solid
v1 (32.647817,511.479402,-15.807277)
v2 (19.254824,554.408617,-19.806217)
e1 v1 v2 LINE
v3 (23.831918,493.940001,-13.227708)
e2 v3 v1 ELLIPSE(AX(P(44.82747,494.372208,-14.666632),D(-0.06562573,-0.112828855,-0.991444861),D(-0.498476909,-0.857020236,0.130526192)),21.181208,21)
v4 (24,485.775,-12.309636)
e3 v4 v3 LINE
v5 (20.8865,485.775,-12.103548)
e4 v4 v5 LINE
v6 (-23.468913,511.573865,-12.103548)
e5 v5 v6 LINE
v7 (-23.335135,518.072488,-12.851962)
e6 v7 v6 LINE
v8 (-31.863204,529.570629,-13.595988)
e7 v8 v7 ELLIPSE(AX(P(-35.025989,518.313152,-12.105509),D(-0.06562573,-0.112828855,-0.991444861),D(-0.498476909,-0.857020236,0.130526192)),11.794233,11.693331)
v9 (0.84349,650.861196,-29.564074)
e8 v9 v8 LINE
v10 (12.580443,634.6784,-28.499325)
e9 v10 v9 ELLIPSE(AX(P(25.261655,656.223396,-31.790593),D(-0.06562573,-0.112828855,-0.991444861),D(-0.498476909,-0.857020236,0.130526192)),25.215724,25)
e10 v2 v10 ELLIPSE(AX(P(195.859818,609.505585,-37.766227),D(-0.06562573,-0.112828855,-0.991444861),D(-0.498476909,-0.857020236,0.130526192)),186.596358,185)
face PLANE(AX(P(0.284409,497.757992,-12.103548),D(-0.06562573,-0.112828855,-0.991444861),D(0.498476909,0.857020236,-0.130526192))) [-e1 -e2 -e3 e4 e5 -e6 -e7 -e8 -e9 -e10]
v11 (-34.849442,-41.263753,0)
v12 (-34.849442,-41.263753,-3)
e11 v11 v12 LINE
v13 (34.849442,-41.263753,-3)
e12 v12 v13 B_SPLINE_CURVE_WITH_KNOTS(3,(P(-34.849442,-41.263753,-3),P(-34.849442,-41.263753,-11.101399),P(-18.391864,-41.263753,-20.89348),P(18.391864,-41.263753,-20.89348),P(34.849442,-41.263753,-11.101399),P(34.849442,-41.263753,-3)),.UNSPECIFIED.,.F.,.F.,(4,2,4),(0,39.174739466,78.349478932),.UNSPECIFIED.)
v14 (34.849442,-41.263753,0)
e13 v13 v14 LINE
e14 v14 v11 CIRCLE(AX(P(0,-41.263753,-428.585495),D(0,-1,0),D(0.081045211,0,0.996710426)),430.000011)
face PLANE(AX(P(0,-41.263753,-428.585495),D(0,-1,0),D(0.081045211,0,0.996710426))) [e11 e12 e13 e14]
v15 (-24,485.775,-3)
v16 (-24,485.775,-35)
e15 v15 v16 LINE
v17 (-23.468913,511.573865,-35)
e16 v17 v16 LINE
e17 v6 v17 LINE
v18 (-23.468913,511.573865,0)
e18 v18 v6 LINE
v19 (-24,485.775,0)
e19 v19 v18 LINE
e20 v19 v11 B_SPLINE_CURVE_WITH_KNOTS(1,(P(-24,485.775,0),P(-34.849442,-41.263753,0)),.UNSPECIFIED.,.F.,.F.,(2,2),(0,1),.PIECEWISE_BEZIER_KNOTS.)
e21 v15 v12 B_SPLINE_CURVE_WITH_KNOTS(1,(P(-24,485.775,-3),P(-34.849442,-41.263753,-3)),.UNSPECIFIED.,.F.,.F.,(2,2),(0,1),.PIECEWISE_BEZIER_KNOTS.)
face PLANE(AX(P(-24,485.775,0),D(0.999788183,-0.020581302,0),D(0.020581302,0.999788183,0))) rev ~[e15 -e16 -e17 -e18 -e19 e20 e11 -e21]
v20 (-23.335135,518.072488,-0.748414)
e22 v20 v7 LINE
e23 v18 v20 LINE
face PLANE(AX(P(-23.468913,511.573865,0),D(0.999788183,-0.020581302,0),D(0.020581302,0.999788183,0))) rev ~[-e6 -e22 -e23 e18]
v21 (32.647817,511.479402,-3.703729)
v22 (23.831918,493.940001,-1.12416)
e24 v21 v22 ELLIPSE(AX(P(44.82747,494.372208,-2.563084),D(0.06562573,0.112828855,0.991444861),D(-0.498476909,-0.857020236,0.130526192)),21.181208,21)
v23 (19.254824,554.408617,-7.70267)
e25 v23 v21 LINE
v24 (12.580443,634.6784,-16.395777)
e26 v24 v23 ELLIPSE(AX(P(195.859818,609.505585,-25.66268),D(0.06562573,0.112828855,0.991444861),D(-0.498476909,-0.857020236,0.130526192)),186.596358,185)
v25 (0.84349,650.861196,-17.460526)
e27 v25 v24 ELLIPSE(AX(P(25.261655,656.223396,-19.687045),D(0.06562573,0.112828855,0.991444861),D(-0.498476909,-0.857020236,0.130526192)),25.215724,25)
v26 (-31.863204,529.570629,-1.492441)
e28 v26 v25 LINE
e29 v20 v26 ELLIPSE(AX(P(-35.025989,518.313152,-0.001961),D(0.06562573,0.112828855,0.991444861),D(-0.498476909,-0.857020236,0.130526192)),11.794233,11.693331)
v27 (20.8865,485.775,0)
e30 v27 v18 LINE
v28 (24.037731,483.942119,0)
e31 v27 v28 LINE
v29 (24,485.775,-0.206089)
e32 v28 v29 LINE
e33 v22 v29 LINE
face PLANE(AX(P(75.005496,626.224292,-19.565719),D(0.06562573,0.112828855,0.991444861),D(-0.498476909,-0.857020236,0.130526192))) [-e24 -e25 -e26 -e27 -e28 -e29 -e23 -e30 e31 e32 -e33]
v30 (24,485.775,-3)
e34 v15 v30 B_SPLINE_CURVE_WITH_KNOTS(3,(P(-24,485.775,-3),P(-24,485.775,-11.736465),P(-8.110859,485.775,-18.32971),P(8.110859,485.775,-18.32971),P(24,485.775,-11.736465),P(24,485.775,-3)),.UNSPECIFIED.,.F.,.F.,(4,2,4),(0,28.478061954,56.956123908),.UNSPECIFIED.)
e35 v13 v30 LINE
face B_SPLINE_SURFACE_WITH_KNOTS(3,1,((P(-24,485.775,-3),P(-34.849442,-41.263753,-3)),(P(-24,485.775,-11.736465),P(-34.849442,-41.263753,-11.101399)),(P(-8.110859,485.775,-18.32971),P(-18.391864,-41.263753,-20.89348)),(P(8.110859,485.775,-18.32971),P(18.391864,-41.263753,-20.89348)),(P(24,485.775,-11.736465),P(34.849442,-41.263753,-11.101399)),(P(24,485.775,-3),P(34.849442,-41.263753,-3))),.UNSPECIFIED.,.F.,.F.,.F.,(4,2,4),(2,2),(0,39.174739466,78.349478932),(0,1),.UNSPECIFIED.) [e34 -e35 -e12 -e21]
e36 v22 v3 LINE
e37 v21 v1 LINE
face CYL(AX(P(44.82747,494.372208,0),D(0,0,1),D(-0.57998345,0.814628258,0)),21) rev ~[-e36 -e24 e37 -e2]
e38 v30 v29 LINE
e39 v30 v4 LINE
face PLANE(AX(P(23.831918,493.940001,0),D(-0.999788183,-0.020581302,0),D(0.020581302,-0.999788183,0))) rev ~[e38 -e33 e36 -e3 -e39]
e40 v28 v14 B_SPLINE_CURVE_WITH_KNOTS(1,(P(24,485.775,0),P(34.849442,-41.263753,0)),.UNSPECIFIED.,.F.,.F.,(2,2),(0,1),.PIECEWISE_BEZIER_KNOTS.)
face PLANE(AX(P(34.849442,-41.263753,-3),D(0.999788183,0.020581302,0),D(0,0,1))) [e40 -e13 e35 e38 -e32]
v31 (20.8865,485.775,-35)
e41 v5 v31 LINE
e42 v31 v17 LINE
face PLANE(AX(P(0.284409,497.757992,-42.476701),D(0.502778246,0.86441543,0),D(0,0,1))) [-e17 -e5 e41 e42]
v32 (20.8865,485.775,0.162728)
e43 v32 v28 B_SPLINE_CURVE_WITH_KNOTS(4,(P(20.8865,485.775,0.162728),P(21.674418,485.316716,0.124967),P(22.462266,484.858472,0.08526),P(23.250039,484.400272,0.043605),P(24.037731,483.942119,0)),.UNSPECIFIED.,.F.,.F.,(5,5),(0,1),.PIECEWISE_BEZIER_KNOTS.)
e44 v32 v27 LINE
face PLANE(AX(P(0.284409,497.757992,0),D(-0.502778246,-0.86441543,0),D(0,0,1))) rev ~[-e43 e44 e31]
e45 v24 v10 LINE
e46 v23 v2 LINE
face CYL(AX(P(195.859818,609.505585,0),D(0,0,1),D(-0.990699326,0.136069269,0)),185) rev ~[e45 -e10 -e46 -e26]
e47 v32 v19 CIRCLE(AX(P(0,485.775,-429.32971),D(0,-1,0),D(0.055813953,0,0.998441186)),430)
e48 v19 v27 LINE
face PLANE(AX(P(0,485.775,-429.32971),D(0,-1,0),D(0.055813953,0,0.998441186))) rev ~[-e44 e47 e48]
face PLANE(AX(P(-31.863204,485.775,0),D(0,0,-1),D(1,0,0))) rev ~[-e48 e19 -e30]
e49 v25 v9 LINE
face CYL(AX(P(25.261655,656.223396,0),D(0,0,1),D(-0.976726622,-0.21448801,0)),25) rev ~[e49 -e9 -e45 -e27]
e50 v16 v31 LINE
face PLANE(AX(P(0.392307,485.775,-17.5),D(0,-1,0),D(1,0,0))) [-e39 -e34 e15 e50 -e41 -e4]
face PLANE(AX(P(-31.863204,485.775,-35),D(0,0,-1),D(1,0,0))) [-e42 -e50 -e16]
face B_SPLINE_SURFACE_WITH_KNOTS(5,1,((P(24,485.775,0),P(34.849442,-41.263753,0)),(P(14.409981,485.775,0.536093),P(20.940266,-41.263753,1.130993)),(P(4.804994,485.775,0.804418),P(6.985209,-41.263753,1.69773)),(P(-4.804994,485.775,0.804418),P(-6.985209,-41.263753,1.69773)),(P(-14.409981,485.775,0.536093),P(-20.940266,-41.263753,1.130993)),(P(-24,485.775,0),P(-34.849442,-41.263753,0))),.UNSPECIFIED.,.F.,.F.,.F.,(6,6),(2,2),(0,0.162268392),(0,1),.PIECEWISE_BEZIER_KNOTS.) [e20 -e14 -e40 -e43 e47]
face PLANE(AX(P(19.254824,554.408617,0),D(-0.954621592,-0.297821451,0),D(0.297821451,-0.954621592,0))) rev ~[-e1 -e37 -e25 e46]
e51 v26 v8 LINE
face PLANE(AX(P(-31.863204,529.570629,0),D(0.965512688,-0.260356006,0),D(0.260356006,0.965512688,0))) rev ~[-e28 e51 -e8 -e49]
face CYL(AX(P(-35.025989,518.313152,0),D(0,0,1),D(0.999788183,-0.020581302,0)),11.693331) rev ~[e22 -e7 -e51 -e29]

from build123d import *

# Parameters (mm, degrees)
F17_W          = 64.5110210379
F17_H          = 35
F18_DEPTH      = 165.0861956251
F21_DEPTH      = 300.8879553896
F21_DEPTH_BACK = 107.3482027968
F23_DEPTH      = 35.0010001


# Not quite as in the source:
# - ends of sketch curves that miss each other by under 0.0002 mm in the source are joined


with BuildPart() as f16:
    # F12 (on plane+point) → F16 section 0
    with BuildSketch(Plane.XZ.offset(-485.775)):
        with BuildLine():
            Line((24, -3), (24, 0))
            ThreePointArc((24, 0), (0, 0.6702898704), (-24, 0))
            Line((-24, 0), (-24, -3))
            add(Edge.make_bspline(
                [(0, -18.3297101296), (-8.1108585, -18.3297101296), (-24, -11.7364646867), (-24, -3)],
                knots=[0, 0, 0, 0, 28.4780619541, 28.4780619541, 28.4780619541, 28.4780619541], degree=3))
            add(Edge.make_bspline(
                [(0, -18.3297101296), (8.1108585, -18.3297101296), (24, -11.7364646867), (24, -3)],
                knots=[0, 0, 0, 0, 28.4780619541, 28.4780619541, 28.4780619541, 28.4780619541], degree=3))
        make_face()
    # F15 (on plane+point) → F16 section 1
    with BuildSketch(Plane.XZ.offset(41.2637528239)):
        with BuildLine():
            Line((34.849441672, -3), (34.849441672, 0))
            ThreePointArc((34.849441672, 0), (-4.636e-07, 1.414516756), (-34.849441672, 0))
            Line((-34.849441672, 0), (-34.849441672, -3))
            add(Edge.make_bspline(
                [(0, -20.8934800247), (-18.3918643743, -20.8934800247), (-34.849441672, -11.1013991282), (-34.849441672, -3)],
                knots=[0, 0, 0, 0, 39.1747394662, 39.1747394662, 39.1747394662, 39.1747394662], degree=3))
            add(Edge.make_bspline(
                [(0, -20.8934800247), (18.3918643743, -20.8934800247), (34.849441672, -11.1013991282), (34.849441672, -3)],
                knots=[0, 0, 0, 0, 39.1747394662, 39.1747394662, 39.1747394662, 39.1747394662], degree=3))
        make_face()
    loft()

    # F17 (on plane+point) → F18 (join, through all)
    with BuildSketch(Plane.XZ.offset(-485.775)):
        with Locations((0.3923069216, -17.5)):
            Rectangle(F17_W, F17_H)
    extrude(amount=-F18_DEPTH)

    # F20 (on line) → F21 (cut, two sides)
    with BuildSketch(Plane(origin=(-216.1177251342, 125.7026275723, 0), x_dir=(-0.5027782463, -0.8644154297, 0), z_dir=(-0.8644154297, 0.5027782463, 0))) as f21_sk:
        Polygon((-579.0290724854, -19.5657188317), (-430.4126832009, 0), (-430.4126832009, 11.4312007947), (-603.4596902493, 11.4312007947), (-603.4596902493, -22.782070678), align=None)
        Polygon((-577.4627581787, -31.4630571682), (-579.0290724854, -19.5657188317), (-603.4596902493, -22.782070678), (-603.4596902493, -42.47670056), (-430.4126832009, -42.47670056), (-430.4126832009, -12.103547527), align=None)
    extrude(amount=-F21_DEPTH, mode=Mode.SUBTRACT)
    extrude(f21_sk.sketch, amount=F21_DEPTH_BACK, mode=Mode.SUBTRACT)

    # F22 (on Top) → F23 (cut, through all)
    with BuildSketch(Plane.XY):
        with BuildLine():
            Line((-24, 485.775), (-23.4689132846, 511.5738649171))
            Line((-23.4689132846, 511.5738649171), (-23.3351348237, 518.0724881039))
            ThreePointArc((-23.3351348237, 518.0724881039), (-25.6339997847, 525.2791071894), (-31.8632035974, 529.5706289024))
            Line((-31.8632035974, 529.5706289024), (0.8434898226, 650.8611956251))
            ThreePointArc((0.8434898226, 650.8611956251), (5.0240250103, 641.5455786867), (12.5804428166, 634.6783999841))
            ThreePointArc((12.5804428166, 634.6783999841), (11.496048805, 594.1758564179), (19.2548236248, 554.408616647))
            Line((19.2548236248, 554.408616647), (32.6478174405, 511.4794017912))
            ThreePointArc((32.6478174405, 511.4794017912), (26.0643094519, 503.8032110141), (23.8319180476, 493.9400010445))
            Line((23.8319180476, 493.9400010445), (24.0377310644, 483.9421192188))
            Line((24.0377310644, 483.9421192188), (47.9396730661, 474.6490120888))
            Line((47.9396730661, 474.6490120888), (47.9396730661, 656.2497676849))
            Line((47.9396730661, 656.2497676849), (-50.3920817524, 656.2497676849))
            Line((-50.3920817524, 656.2497676849), (-50.3920817524, 480.0127209663))
            Line((-50.3920817524, 480.0127209663), (-24, 485.775))
        make_face()
    extrude(amount=-F23_DEPTH, mode=Mode.SUBTRACT)


solid = f16.part
